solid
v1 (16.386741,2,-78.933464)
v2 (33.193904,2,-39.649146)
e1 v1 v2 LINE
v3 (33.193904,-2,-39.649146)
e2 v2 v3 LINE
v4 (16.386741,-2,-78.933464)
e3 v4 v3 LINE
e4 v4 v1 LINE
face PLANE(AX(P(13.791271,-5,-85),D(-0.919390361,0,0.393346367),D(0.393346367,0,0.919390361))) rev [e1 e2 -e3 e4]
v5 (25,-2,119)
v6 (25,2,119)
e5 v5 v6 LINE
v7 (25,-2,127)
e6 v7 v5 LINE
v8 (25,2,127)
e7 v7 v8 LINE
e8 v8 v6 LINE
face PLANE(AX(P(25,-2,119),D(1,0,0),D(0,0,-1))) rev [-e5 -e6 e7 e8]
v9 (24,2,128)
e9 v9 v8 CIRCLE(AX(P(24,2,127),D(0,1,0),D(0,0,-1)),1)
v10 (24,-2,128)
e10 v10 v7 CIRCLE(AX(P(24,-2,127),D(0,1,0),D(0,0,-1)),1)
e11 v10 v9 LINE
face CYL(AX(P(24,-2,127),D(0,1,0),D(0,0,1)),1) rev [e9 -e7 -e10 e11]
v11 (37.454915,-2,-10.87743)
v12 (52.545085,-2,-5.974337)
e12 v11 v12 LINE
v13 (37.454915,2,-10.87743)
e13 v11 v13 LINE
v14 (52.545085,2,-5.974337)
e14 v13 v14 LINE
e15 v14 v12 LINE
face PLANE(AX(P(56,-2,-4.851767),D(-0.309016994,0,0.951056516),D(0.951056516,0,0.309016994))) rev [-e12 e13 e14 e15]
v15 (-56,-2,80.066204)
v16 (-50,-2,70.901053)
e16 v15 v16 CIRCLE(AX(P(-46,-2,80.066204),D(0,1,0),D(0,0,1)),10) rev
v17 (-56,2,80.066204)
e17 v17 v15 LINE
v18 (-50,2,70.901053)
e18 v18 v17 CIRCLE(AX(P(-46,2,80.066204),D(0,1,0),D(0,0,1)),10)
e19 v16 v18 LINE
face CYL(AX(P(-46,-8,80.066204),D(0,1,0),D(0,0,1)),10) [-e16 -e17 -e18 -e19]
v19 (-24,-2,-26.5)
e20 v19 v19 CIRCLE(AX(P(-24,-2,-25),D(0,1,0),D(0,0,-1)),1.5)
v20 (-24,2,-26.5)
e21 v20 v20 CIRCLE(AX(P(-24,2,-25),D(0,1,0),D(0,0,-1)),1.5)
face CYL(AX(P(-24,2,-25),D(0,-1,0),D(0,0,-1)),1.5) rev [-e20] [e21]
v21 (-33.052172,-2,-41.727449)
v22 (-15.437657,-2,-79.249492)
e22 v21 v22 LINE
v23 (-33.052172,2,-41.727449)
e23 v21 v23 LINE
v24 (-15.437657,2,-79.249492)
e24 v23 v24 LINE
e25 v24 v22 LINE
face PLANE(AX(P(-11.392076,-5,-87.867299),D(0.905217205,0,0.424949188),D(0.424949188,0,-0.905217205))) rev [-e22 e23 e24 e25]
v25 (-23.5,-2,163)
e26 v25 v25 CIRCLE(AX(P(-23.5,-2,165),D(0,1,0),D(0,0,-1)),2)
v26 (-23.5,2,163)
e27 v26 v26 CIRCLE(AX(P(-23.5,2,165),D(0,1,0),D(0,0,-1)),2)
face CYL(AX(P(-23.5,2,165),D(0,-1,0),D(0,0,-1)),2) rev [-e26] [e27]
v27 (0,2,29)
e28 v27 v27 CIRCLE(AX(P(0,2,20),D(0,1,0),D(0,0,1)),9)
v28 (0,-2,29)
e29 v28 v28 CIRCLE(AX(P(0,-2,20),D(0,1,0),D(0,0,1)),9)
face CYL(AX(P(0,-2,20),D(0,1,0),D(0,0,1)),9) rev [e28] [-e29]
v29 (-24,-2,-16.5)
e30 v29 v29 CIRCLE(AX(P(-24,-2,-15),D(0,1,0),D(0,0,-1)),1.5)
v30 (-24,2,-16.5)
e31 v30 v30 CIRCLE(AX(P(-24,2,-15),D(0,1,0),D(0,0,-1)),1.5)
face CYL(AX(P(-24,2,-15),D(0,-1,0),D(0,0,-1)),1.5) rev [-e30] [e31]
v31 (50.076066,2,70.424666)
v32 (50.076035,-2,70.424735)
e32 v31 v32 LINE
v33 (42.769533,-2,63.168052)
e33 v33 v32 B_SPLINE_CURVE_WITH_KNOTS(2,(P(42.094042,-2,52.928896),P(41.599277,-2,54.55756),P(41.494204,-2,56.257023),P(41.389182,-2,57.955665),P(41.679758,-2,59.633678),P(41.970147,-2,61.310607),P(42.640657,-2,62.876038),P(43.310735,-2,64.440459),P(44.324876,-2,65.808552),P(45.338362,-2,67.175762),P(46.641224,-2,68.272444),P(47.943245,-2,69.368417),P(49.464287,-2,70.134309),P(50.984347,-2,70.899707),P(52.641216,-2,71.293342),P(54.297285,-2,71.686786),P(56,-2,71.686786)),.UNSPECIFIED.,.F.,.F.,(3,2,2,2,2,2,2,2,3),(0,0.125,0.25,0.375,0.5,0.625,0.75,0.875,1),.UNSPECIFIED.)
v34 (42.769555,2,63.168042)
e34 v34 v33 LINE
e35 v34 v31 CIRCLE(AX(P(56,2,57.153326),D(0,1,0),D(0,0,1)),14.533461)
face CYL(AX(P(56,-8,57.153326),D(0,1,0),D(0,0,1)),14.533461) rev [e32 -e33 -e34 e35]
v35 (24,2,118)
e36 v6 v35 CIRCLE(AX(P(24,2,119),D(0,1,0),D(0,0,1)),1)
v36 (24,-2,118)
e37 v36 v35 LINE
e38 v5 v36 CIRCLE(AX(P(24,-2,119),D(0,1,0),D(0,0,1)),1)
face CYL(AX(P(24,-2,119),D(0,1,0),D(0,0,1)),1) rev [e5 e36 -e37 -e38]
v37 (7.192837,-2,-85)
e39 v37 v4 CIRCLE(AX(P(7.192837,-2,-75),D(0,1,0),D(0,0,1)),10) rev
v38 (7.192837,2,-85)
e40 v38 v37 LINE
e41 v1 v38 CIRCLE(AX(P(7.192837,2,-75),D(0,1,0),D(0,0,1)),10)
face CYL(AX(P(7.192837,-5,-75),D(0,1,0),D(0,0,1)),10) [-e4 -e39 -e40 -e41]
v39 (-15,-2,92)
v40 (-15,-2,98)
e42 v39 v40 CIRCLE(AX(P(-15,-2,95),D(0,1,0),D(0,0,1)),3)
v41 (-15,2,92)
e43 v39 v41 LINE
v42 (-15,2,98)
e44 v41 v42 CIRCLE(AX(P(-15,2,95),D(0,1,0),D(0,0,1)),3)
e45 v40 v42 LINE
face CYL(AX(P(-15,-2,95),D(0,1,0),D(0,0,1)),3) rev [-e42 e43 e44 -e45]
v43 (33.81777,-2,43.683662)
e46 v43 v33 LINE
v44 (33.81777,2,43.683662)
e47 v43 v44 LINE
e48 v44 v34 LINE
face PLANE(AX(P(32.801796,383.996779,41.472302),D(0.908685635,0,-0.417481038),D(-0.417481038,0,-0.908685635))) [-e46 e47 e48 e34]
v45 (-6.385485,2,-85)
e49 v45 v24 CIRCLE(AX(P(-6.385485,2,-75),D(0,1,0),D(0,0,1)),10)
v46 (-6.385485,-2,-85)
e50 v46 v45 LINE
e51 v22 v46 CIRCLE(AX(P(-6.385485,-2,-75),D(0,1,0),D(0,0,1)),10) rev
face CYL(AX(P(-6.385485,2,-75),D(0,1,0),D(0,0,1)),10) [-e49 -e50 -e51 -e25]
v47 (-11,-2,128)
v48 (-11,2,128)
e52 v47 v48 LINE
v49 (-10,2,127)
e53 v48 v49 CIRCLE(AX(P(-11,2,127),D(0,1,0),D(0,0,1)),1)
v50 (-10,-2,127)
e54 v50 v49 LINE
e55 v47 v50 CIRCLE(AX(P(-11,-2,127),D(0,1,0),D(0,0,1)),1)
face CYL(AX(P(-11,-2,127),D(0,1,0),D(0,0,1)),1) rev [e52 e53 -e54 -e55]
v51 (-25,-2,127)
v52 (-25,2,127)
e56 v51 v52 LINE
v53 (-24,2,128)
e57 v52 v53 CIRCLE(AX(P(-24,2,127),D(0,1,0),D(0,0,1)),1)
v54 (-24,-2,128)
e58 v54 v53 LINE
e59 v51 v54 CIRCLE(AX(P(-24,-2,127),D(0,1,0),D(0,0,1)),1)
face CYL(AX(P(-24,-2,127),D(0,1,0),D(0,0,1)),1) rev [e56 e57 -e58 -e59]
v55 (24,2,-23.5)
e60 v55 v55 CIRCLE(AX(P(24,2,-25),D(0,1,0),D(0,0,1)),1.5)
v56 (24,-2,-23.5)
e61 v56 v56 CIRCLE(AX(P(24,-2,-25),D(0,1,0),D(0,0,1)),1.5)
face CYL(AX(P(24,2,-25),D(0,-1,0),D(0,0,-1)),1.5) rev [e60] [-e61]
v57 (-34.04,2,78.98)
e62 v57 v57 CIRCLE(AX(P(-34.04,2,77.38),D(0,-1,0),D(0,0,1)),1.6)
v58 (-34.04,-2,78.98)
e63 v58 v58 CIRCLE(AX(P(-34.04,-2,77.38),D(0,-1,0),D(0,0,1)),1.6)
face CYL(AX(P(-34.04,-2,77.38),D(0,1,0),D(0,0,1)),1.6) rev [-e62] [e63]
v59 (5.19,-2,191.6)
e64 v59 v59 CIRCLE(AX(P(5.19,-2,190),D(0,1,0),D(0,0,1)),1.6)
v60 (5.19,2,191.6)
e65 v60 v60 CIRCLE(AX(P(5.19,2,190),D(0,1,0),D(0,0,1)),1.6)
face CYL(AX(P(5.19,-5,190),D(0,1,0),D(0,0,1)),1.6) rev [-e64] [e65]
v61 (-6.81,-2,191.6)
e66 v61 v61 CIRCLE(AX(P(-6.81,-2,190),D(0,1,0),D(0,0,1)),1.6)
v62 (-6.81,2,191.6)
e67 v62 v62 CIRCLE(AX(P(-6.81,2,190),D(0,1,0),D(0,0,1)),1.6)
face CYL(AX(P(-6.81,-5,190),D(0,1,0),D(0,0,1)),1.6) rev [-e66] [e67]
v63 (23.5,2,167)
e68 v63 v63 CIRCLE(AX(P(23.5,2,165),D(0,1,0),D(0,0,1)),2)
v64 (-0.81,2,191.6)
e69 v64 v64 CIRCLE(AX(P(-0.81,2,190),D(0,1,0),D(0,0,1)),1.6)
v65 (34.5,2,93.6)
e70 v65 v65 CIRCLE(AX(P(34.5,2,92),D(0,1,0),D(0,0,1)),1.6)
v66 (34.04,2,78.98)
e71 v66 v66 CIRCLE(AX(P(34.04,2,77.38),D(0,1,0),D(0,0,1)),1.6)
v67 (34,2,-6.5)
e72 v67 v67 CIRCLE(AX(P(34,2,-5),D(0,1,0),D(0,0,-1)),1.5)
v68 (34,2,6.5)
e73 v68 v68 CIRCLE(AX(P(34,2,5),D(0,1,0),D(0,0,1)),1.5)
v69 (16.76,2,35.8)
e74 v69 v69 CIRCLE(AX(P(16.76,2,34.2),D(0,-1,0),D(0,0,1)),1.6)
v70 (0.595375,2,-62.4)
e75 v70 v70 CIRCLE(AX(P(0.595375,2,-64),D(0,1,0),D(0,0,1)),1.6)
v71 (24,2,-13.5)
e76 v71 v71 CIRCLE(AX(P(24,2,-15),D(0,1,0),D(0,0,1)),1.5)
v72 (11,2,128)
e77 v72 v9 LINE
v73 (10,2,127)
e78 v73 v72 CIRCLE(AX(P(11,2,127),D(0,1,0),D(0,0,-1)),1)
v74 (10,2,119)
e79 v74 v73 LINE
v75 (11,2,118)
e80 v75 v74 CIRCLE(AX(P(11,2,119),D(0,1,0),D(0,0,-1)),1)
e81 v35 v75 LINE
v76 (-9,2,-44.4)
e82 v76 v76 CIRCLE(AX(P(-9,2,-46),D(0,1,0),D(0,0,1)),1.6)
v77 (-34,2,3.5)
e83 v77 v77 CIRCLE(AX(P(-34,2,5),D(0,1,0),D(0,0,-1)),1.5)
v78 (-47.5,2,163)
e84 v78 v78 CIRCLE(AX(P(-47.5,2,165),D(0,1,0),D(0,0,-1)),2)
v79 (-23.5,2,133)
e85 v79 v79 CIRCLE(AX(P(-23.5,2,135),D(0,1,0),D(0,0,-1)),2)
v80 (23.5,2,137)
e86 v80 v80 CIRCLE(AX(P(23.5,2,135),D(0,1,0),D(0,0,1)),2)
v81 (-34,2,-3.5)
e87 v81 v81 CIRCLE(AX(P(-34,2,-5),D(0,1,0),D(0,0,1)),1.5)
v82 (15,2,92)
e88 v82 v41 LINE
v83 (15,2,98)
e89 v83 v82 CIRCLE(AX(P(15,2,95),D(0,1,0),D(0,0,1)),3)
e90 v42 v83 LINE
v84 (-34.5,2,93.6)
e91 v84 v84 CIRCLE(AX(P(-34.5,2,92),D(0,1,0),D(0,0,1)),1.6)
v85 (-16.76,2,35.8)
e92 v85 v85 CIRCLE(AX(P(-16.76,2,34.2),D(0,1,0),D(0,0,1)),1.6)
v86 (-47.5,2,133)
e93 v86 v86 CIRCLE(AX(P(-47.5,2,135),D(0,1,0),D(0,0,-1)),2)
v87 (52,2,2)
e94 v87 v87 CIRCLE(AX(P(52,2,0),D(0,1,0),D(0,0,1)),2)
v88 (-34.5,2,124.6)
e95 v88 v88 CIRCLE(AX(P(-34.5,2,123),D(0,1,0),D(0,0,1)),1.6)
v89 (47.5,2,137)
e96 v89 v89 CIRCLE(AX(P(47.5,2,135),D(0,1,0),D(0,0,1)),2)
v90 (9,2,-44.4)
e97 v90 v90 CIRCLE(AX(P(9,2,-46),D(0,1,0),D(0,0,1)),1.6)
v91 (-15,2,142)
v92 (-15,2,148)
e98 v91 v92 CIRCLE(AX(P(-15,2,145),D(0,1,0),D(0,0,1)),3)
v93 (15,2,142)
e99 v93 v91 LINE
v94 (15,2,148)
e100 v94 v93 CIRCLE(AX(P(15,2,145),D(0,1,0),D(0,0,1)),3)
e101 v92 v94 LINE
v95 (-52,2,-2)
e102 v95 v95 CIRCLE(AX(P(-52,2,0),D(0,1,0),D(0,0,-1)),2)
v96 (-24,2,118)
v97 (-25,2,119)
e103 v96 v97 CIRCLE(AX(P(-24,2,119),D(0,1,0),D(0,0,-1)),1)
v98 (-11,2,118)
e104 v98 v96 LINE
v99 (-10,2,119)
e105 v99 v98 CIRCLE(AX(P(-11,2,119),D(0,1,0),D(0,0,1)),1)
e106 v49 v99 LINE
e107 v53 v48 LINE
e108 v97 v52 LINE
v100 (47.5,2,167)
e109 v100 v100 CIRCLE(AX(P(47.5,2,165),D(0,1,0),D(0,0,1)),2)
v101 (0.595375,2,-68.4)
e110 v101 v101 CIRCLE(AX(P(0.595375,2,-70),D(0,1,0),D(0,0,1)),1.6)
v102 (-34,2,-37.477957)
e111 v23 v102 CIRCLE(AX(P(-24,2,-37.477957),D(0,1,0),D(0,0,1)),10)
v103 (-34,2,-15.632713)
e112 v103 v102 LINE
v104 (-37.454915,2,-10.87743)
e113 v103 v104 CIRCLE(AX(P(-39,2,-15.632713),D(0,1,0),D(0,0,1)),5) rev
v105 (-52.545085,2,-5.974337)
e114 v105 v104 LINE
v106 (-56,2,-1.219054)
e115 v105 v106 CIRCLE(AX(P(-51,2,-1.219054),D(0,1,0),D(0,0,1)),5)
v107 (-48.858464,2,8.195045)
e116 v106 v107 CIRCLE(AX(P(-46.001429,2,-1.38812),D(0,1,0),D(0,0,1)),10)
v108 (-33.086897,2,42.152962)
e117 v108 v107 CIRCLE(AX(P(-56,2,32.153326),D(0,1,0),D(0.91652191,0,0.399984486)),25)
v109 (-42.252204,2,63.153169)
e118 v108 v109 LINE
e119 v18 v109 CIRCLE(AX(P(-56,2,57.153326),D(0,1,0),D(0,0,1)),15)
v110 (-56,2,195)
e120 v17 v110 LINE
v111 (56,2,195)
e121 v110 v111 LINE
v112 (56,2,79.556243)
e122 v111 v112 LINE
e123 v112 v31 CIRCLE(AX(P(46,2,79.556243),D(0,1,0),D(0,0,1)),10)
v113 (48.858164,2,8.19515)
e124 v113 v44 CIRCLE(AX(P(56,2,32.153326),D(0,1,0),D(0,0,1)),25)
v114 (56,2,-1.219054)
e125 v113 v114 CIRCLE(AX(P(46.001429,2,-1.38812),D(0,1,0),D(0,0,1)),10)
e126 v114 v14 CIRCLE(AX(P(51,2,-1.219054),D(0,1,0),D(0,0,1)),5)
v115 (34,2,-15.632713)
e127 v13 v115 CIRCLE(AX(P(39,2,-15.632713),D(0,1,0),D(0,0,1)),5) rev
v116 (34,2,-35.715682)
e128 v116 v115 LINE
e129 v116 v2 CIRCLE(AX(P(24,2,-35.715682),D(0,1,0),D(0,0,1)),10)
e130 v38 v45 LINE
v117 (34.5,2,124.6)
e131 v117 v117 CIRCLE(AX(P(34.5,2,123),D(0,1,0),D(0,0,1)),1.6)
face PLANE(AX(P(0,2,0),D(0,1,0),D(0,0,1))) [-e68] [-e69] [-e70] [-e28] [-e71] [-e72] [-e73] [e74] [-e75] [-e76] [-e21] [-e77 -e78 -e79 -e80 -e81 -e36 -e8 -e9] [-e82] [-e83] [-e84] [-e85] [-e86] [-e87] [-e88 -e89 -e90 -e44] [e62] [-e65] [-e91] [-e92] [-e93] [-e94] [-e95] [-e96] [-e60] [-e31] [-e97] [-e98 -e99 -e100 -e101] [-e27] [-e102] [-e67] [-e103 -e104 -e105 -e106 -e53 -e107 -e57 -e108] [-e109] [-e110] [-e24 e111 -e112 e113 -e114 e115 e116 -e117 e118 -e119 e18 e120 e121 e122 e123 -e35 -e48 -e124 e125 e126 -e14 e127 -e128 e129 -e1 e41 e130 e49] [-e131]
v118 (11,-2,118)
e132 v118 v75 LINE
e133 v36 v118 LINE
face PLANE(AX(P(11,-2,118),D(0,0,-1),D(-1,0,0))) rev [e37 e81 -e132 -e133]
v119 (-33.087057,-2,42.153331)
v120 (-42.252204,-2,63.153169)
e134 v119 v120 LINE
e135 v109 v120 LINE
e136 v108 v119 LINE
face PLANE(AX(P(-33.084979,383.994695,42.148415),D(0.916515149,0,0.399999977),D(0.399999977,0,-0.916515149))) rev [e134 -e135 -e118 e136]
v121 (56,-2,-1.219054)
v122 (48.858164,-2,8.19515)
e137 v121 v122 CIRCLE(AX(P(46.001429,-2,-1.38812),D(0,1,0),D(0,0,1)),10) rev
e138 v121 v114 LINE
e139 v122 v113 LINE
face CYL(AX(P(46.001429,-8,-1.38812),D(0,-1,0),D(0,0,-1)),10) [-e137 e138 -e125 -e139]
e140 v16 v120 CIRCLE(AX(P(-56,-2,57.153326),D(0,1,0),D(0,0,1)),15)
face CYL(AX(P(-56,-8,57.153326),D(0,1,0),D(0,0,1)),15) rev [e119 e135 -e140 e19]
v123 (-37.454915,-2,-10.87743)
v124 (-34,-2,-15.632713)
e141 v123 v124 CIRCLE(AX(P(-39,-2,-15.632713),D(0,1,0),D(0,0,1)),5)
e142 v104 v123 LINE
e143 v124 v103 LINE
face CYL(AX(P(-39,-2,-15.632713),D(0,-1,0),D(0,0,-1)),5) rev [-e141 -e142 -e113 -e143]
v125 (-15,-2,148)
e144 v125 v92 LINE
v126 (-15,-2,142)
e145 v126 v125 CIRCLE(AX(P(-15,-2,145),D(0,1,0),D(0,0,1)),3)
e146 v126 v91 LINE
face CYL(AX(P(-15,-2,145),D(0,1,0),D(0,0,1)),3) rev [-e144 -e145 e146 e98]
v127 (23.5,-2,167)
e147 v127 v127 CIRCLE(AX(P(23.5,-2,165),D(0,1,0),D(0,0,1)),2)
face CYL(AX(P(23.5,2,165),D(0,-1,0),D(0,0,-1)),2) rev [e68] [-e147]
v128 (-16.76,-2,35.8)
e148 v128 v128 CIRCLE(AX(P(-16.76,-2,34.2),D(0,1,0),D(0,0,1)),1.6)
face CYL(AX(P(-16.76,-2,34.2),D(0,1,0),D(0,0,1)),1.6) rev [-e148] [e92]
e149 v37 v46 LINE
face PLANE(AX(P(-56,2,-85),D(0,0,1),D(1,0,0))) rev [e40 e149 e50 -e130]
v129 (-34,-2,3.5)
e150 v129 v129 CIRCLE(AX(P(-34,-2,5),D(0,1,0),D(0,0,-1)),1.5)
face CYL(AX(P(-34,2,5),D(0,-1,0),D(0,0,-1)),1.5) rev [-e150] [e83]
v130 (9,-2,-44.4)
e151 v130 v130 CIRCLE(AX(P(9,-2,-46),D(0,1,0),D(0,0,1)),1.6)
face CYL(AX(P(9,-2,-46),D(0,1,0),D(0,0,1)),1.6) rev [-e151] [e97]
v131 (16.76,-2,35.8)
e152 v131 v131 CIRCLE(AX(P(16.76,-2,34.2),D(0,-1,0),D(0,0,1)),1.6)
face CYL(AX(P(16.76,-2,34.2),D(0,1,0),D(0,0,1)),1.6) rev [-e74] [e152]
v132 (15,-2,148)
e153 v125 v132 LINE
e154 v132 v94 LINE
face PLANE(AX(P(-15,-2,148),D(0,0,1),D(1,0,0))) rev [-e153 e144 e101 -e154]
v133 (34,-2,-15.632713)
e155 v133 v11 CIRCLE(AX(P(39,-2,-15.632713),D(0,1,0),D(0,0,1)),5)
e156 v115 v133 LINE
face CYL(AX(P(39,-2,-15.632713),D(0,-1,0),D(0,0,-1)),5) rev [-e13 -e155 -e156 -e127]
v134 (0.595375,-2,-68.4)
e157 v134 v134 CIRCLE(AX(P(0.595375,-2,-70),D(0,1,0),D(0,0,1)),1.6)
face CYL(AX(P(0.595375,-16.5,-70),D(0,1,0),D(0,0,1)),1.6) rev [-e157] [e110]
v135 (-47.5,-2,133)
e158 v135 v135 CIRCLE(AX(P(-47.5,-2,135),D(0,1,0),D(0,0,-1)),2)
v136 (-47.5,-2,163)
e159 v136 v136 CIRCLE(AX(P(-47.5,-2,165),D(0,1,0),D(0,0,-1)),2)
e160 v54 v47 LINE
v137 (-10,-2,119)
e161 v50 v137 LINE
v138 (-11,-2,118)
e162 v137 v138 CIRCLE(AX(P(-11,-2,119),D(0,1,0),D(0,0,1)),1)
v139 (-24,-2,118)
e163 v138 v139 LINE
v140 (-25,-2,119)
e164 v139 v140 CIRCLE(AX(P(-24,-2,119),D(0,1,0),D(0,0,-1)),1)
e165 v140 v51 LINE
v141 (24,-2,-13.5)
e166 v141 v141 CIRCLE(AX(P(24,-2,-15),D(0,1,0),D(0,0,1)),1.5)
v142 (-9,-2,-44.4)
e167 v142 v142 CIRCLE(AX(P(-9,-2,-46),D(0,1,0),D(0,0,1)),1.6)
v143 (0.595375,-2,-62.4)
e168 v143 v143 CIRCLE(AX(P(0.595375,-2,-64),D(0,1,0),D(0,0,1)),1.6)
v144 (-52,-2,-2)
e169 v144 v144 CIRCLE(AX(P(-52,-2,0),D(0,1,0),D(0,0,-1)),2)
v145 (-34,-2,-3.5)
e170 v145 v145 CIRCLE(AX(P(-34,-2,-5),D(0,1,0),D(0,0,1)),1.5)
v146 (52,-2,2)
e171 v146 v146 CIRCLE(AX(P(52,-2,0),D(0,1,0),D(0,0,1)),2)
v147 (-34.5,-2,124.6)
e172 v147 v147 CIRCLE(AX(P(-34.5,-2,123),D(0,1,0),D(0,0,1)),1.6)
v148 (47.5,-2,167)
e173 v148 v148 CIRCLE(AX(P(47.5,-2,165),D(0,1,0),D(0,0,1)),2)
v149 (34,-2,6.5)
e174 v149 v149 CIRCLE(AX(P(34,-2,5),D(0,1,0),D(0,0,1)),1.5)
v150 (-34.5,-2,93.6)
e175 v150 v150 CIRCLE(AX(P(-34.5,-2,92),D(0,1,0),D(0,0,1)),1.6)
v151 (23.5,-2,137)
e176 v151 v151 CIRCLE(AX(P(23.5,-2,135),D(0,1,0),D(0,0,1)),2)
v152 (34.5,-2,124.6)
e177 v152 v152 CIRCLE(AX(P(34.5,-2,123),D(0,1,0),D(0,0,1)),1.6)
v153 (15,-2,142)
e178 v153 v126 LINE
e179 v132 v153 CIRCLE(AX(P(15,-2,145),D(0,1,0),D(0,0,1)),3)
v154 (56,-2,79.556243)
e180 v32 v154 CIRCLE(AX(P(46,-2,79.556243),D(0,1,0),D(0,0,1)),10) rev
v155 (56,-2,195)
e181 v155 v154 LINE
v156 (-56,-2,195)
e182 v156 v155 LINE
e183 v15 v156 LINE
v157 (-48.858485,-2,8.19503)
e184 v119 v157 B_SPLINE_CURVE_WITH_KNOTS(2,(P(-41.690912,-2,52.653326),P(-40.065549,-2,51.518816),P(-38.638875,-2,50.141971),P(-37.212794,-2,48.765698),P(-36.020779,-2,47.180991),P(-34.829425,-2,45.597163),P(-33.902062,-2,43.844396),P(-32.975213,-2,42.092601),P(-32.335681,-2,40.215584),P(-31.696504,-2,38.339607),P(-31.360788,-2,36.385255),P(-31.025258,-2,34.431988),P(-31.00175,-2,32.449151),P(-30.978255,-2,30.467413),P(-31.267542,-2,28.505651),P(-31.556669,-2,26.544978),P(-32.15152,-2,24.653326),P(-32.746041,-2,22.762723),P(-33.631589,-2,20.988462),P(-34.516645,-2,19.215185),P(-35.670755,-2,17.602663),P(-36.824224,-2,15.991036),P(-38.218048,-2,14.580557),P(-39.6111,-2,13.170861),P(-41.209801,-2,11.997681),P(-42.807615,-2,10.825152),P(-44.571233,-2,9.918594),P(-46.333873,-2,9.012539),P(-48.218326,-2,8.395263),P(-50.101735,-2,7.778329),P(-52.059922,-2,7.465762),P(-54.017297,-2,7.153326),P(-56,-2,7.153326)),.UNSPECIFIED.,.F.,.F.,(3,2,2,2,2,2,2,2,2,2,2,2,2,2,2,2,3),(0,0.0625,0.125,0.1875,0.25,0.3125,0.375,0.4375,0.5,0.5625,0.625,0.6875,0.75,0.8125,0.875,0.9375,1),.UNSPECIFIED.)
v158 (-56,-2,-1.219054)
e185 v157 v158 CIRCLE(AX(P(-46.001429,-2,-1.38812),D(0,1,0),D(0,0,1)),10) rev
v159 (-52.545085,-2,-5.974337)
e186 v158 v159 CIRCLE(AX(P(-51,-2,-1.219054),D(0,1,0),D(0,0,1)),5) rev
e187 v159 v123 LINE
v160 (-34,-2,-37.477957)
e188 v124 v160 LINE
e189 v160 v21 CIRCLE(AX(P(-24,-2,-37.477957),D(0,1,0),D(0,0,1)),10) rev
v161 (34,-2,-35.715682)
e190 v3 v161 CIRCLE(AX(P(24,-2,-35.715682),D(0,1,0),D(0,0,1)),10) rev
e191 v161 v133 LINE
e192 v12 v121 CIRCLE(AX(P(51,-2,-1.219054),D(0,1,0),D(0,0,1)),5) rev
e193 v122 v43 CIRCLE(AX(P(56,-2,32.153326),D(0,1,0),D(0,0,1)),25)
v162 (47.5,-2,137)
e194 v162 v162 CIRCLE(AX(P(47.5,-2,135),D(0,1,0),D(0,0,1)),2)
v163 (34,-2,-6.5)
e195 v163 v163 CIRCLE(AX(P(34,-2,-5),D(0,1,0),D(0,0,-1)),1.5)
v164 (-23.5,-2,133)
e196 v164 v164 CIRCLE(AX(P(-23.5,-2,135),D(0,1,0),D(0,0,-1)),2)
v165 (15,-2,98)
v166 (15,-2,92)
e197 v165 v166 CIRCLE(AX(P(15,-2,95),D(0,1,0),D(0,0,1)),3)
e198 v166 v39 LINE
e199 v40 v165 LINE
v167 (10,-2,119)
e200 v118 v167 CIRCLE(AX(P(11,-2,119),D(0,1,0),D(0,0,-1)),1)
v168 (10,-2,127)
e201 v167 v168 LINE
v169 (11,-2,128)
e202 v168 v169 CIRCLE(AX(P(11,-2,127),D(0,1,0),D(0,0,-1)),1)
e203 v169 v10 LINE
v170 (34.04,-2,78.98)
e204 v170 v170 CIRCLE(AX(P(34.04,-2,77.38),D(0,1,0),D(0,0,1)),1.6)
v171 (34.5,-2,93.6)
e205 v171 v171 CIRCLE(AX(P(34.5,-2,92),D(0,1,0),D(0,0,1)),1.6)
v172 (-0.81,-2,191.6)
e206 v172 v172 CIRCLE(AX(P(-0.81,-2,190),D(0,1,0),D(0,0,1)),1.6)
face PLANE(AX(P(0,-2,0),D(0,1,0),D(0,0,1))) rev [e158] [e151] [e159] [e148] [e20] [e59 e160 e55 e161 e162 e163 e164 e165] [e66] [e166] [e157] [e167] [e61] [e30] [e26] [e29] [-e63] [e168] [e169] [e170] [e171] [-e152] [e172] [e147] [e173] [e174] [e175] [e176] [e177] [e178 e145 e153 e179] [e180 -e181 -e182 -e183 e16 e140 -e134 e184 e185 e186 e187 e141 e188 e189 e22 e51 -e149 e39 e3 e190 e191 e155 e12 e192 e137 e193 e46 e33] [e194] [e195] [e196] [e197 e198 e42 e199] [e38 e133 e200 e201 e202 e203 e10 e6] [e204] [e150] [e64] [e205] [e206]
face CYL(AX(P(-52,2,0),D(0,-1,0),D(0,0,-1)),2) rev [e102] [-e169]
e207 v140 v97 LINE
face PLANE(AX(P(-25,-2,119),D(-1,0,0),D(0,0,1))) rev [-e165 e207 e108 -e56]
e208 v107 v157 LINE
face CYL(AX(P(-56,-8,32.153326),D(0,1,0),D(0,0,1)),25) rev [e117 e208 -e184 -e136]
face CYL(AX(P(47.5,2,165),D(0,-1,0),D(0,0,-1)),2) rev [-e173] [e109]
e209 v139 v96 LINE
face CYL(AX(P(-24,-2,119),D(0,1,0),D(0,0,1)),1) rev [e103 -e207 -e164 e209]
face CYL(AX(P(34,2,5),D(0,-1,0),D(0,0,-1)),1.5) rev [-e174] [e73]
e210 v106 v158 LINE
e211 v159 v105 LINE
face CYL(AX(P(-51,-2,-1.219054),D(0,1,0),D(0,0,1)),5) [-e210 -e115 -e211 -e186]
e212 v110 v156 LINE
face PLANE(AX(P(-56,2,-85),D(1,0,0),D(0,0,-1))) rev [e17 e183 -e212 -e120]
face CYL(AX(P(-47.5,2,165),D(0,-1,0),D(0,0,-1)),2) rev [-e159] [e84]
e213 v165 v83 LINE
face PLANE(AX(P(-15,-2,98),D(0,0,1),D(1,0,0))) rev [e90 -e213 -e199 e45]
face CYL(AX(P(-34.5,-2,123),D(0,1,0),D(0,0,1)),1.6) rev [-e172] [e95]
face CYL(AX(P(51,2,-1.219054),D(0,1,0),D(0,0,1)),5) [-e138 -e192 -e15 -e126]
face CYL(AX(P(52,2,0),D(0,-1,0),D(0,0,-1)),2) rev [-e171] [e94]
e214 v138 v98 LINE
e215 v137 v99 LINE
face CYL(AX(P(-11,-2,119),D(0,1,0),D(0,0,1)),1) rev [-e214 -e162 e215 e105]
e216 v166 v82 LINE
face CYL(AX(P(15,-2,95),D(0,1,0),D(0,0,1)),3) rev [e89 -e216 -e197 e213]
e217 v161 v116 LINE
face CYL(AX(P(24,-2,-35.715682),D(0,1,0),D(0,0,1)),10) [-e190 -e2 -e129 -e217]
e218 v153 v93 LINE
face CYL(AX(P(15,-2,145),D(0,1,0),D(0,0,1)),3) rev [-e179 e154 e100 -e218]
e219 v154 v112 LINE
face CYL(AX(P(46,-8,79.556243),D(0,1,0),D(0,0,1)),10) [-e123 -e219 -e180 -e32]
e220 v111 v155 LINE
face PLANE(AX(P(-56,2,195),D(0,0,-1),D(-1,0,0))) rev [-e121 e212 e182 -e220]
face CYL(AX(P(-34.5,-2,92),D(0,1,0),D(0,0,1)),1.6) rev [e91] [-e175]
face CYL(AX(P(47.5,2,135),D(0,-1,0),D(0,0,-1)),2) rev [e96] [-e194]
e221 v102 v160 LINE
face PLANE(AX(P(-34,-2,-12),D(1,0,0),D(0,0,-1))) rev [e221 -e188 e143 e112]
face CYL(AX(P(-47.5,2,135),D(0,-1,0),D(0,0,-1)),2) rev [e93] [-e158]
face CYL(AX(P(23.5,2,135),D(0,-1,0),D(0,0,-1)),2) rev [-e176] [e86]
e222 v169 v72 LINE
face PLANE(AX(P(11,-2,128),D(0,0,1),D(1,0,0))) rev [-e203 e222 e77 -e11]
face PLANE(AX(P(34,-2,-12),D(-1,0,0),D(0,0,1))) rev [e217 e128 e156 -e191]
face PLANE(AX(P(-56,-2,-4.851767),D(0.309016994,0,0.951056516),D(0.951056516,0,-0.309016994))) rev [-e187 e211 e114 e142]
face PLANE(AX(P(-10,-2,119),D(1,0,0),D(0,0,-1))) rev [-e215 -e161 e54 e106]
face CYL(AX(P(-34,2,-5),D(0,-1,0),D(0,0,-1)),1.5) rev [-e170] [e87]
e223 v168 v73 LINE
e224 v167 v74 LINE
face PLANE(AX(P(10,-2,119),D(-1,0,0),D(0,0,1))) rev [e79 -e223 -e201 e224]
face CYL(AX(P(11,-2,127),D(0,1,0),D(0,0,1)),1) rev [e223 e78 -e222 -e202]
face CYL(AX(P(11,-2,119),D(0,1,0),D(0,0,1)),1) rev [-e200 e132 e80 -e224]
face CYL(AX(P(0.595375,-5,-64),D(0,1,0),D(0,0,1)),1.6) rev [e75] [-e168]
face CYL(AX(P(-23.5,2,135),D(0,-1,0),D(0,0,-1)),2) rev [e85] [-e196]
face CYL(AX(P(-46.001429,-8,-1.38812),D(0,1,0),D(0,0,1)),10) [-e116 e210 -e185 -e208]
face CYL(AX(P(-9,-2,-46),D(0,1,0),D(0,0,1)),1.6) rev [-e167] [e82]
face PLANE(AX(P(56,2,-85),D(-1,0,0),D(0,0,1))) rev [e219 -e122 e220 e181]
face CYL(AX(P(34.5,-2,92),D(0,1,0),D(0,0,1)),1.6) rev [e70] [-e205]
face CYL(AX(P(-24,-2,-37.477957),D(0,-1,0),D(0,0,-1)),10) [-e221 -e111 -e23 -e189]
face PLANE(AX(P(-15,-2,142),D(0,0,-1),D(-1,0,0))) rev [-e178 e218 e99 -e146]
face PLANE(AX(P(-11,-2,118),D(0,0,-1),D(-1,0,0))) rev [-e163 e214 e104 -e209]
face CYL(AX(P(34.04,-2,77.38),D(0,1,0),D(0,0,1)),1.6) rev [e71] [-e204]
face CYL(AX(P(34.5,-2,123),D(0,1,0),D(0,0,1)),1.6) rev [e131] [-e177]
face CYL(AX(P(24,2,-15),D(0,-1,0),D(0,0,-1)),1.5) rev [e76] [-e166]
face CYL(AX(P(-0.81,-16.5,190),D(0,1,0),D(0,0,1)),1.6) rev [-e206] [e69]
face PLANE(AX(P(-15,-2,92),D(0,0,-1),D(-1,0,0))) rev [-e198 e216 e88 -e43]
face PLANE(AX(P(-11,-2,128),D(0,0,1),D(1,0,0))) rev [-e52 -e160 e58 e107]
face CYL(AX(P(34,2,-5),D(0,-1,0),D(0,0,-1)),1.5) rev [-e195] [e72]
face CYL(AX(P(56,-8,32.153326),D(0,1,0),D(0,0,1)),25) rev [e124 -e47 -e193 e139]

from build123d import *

# Parameters (mm, degrees)
SKETCH1_W               = 112
SKETCH1_H               = 280
SKETCH1_R               = 2
SKETCH1_R_2             = 1.5
BOSS_EXTRUDE1_DEPTH     = 2
CUT_EXTRUDE1_DEPTH      = 203.891596672
CUT_EXTRUDE1_DEPTH_BACK = 203.891596672
CUT_EXTRUDE2_DEPTH      = 203.891596672
CUT_EXTRUDE2_DEPTH_BACK = 203.891596672
SKETCH3_R               = 1.6
SKETCH4_R               = 1.6
CUT_EXTRUDE3_DEPTH      = 203.921166959
CUT_EXTRUDE4_DEPTH      = 203.891596672
CUT_EXTRUDE4_DEPTH_BACK = 203.891596672
SKETCH5_R               = 9
CUT_EXTRUDE5_DEPTH      = 203.891596672
CUT_EXTRUDE5_DEPTH_BACK = 203.891596672
SKETCH6_R               = 1.6
FILLET_1_R              = 5
SKETCH_1_R              = 25
CUT_EXTRUDE_1_DEPTH     = 10
SKETCH_2_R              = 15
SKETCH_2_R_2            = 14.533460532
CUT_EXTRUDE_2_DEPTH     = 10
CUT_EXTRUDE_START       = -5
CUT_EXTRUDE_6_DEPTH     = 6
CUT_EXTRUDE_7_DEPTH     = 6
CUT_EXTRUDE_8_DEPTH     = 5
CUT_EXTRUDE_9_DEPTH     = 5
SKETCH_9_R              = 2
CUT_EXTRUDE_11_DEPTH    = 10
SKETCH_11_R             = 2
CUT_EXTRUDE_12_DEPTH    = 5
SKETCH_12_R             = 2
EXTRUDE_1_DEPTH         = 2
SKETCH_15_R             = 2
CUT_EXTRUDE_13_DEPTH    = 250
FILLET_2_R              = 10
FILLET_3_R              = 10
FILLET_5_R              = 10
FILLET_6_R              = 10
SKETCH_17_R             = 2
CUT_EXTRUDE_16_DEPTH    = 10
CUT_EXTRUDE_17_DEPTH    = 5
CUT_EXTRUDE_18_DEPTH    = 5
FILLET_7_R              = 10
FILLET_8_R              = 10
SKETCH_20_R             = 1.6
EXTRUDE_4_DEPTH         = 7
SKETCH_22_R             = 2
EXTRUDE_6_DEPTH         = 2
SKETCH_23_R             = 1.6
CUT_EXTRUDE_19_DEPTH    = 16.5
SKETCH_24_R             = 1.6
EXTRUDE_7_DEPTH         = 16.5
SKETCH_25_R             = 2
EXTRUDE_8_DEPTH         = 2
SKETCH_26_R             = 1.6
CUT_EXTRUDE_20_DEPTH    = 16.5
SKETCH_27_R             = 1.6
CUT_EXTRUDE_21_DEPTH    = 5
SKETCH_28_R             = 1.6
CUT_EXTRUDE_22_DEPTH    = 5
SKETCH_29_R             = 1.6
CUT_EXTRUDE_23_DEPTH    = 5


with BuildPart() as part:
    # Sketch1 → Boss-Extrude1 (new, symmetric)
    with BuildSketch(Plane(origin=(0, 0, 0), x_dir=(1, 0, 0), z_dir=(0, 1, 0))):
        with Locations((0, -55)):
            Rectangle(SKETCH1_W, SKETCH1_H)
        with Locations(Location((52, 0, 0), (0, 0, 270))):
            Circle(SKETCH1_R, mode=Mode.SUBTRACT)
        with Locations(Location((34, -5, 0), (0, 0, 270))):
            Circle(SKETCH1_R_2, mode=Mode.SUBTRACT)
        with Locations(Location((34, 5, 0), (0, 0, 90))):
            Circle(SKETCH1_R_2, mode=Mode.SUBTRACT)
        with Locations(Location((24, 15, 0), (0, 0, 270))):
            Circle(SKETCH1_R_2, mode=Mode.SUBTRACT)
        with Locations(Location((24, 25, 0), (0, 0, 270))):
            Circle(SKETCH1_R_2, mode=Mode.SUBTRACT)
        with Locations(Location((47.5, -135, 0), (0, 0, 270))):
            Circle(SKETCH1_R, mode=Mode.SUBTRACT)
        with Locations(Location((23.5, -135, 0), (0, 0, 270))):
            Circle(SKETCH1_R, mode=Mode.SUBTRACT)
        with Locations(Location((23.5, -165, 0), (0, 0, 270))):
            Circle(SKETCH1_R, mode=Mode.SUBTRACT)
        with Locations(Location((47.5, -165, 0), (0, 0, 270))):
            Circle(SKETCH1_R, mode=Mode.SUBTRACT)
        with Locations(Location((-47.5, -135, 0), (0, 0, 90))):
            Circle(SKETCH1_R, mode=Mode.SUBTRACT)
        with Locations(Location((-47.5, -165, 0), (0, 0, 90))):
            Circle(SKETCH1_R, mode=Mode.SUBTRACT)
        with Locations(Location((-23.5, -165, 0), (0, 0, 90))):
            Circle(SKETCH1_R, mode=Mode.SUBTRACT)
        with Locations(Location((-23.5, -135, 0), (0, 0, 90))):
            Circle(SKETCH1_R, mode=Mode.SUBTRACT)
        with Locations(Location((-34, -5, 0), (0, 0, 90))):
            Circle(SKETCH1_R_2, mode=Mode.SUBTRACT)
        with Locations(Location((-52, 0, 0), (0, 0, 90))):
            Circle(SKETCH1_R, mode=Mode.SUBTRACT)
        with Locations(Location((-34, 5, 0), (0, 0, 270))):
            Circle(SKETCH1_R_2, mode=Mode.SUBTRACT)
        with Locations(Location((-24, 15, 0), (0, 0, 90))):
            Circle(SKETCH1_R_2, mode=Mode.SUBTRACT)
        with Locations(Location((-24, 25, 0), (0, 0, 90))):
            Circle(SKETCH1_R_2, mode=Mode.SUBTRACT)
    extrude(amount=BOSS_EXTRUDE1_DEPTH, both=True)

    # Sketch2 → Cut-Extrude1 (cut, two sides: drawn at the far end of the back side and taken through both)
    with BuildSketch(Plane(origin=(0, 0, 0), x_dir=(1, 0, 0), z_dir=(0, 1, 0)).offset(-CUT_EXTRUDE1_DEPTH_BACK)):
        Polygon((-56, 4.851766683), (-34, 12), (-34, 85), (-56, 85), align=None)
        Polygon((56, 85), (56, 4.851766683), (34, 12), (34, 85), align=None)
    extrude(amount=CUT_EXTRUDE1_DEPTH + CUT_EXTRUDE1_DEPTH_BACK, mode=Mode.SUBTRACT)

    # Sketch3 → Cut-Extrude2 (cut, two sides: drawn at the far end of the back side and taken through both)
    with BuildSketch(Plane(origin=(0, 0, 0), x_dir=(1, 0, 0), z_dir=(0, 1, 0)).offset(-CUT_EXTRUDE2_DEPTH_BACK)):
        with Locations(Location((-9, 46, 0), (0, 0, 270))):
            Circle(SKETCH3_R)
        with Locations(Location((9, 46, 0), (0, 0, 270))):
            Circle(SKETCH3_R)
    extrude(amount=CUT_EXTRUDE2_DEPTH + CUT_EXTRUDE2_DEPTH_BACK, mode=Mode.SUBTRACT)

    # Sketch4 → Cut-Extrude3 (cut, through all)
    with BuildSketch(Plane(origin=(0, 2, 0), x_dir=(1, 0, 0), z_dir=(0, 1, 0))):
        with Locations(Location((34.04, -77.38, 0), (0, 0, 270))):
            Circle(SKETCH4_R)
        with Locations(Location((-16.76, -34.2, 0), (0, 0, 270))):
            Circle(SKETCH4_R)
    cut_extrude3 = extrude(amount=-CUT_EXTRUDE3_DEPTH, mode=Mode.SUBTRACT)

    # Sketch5 → Cut-Extrude4 (cut, two sides: drawn at the far end of the back side and taken through both)
    with BuildSketch(Plane(origin=(0, 0, 0), x_dir=(1, 0, 0), z_dir=(0, 1, 0)).offset(-CUT_EXTRUDE4_DEPTH_BACK)):
        with Locations(Location((0, -20, 0), (0, 0, 270))):
            Circle(SKETCH5_R)
        with BuildLine():
            Line((-15, -92), (15, -92))
            ThreePointArc((15, -92), (18, -95), (15, -98))
            Line((15, -98), (-15, -98))
            ThreePointArc((-15, -98), (-18, -95), (-15, -92))
        make_face()
        with BuildLine():
            Line((-15, -142), (15, -142))
            ThreePointArc((15, -142), (18, -145), (15, -148))
            Line((15, -148), (-15, -148))
            ThreePointArc((-15, -148), (-18, -145), (-15, -142))
        make_face()
        with BuildLine():
            Line((11, -118), (24, -118))
            ThreePointArc((24, -118), (24.707106781, -118.292893219), (25, -119))
            Line((25, -119), (25, -127))
            ThreePointArc((25, -127), (24.707106781, -127.707106781), (24, -128))
            Line((24, -128), (11, -128))
            ThreePointArc((11, -128), (10.292893219, -127.707106781), (10, -127))
            Line((10, -127), (10, -119))
            ThreePointArc((10, -119), (10.292893219, -118.292893219), (11, -118))
        make_face()
        with BuildLine():
            Line((-25, -119), (-25, -127))
            ThreePointArc((-25, -127), (-24.707106781, -127.707106781), (-24, -128))
            Line((-24, -128), (-11, -128))
            ThreePointArc((-11, -128), (-10.292893219, -127.707106781), (-10, -127))
            Line((-10, -127), (-10, -119))
            ThreePointArc((-10, -119), (-10.292893219, -118.292893219), (-11, -118))
            Line((-11, -118), (-24, -118))
            ThreePointArc((-24, -118), (-24.707106781, -118.292893219), (-25, -119))
        make_face()
    extrude(amount=CUT_EXTRUDE4_DEPTH + CUT_EXTRUDE4_DEPTH_BACK, mode=Mode.SUBTRACT)

    # Sketch6 → Cut-Extrude5 (cut, two sides: drawn at the far end of the back side and taken through both)
    with BuildSketch(Plane(origin=(0, 0, 0), x_dir=(1, 0, 0), z_dir=(0, 1, 0)).offset(-CUT_EXTRUDE5_DEPTH_BACK)):
        with Locations(Location((-34.5, -92, 0), (0, 0, 270))):
            Circle(SKETCH6_R)
        with Locations(Location((34.5, -92, 0), (0, 0, 270))):
            Circle(SKETCH6_R)
        with Locations(Location((34.5, -123, 0), (0, 0, 270))):
            Circle(SKETCH6_R)
        with Locations(Location((-34.5, -123, 0), (0, 0, 270))):
            Circle(SKETCH6_R)
    extrude(amount=CUT_EXTRUDE5_DEPTH + CUT_EXTRUDE5_DEPTH_BACK, mode=Mode.SUBTRACT)

    # Mirror1: Cut-Extrude3 across plane
    add(cut_extrude3.mirror(Plane(origin=(0, 0, 0), x_dir=(0, 0, 1), z_dir=(1, 0, 0))), mode=Mode.SUBTRACT)

    # 圆角1
    fillet_1_edges = [part.edges().sort_by_distance(p)[0] for p in [
        (56, 0, -4.851766683),
        (34, 0, -12),
        (-56, 0, -4.851766683),
        (-34, 0, -12),
    ]]
    fillet(fillet_1_edges, radius=FILLET_1_R)

    # 草图1 → 切除-拉伸1 (cut)
    with BuildSketch(Plane(origin=(0, 2, 0), x_dir=(1, 0, 0), z_dir=(0, 1, 0))):
        with Locations((-56, -32.153325809)):
            Circle(SKETCH_1_R)
        with Locations((56, -32.153325809)):
            Circle(SKETCH_1_R)
    extrude(amount=-CUT_EXTRUDE_1_DEPTH, mode=Mode.SUBTRACT)

    # 草图2 → 切除-拉伸2 (cut)
    with BuildSketch(Plane(origin=(0, 2, 0), x_dir=(1, 0, 0), z_dir=(0, 1, 0))):
        with Locations((-56, -57.153325809)):
            Circle(SKETCH_2_R)
        with Locations((56, -57.153325809)):
            Circle(SKETCH_2_R_2)
    extrude(amount=-CUT_EXTRUDE_2_DEPTH, mode=Mode.SUBTRACT)

    # 切除-拉伸6: read off the stored shape, not the designer's step
    # 切除-拉伸6 outline → 切除-拉伸6 (cut)
    with BuildSketch(Plane(origin=(0, 2, 0), x_dir=(1, 0, 0), z_dir=(0, 1, 0)).offset(CUT_EXTRUDE_START)):
        with BuildLine():
            ThreePointArc((-41.690911979, -52.653325809), (-41.021386735, -57.954040891), (-42.252204443, -63.153168915))
            Line((-42.252204443, -63.153168915), (-33.086952257, -42.152937958))
            ThreePointArc((-33.086952257, -42.152937958), (-36.662565218, -47.998312904), (-41.690911979, -52.653325809))
        make_face()
    extrude(amount=CUT_EXTRUDE_6_DEPTH, mode=Mode.SUBTRACT)

    # 切除-拉伸7: read off the stored shape, not the designer's step
    # 切除-拉伸7 outline → 切除-拉伸7 (cut)
    with BuildSketch(Plane(origin=(0, 2, 0), x_dir=(1, 0, 0), z_dir=(0, 1, 0)).offset(CUT_EXTRUDE_START)):
        with BuildLine():
            Line((33.817769755, -43.683662376), (42.769555279, -63.16804172))
            ThreePointArc((42.769555279, -63.16804172), (41.498065161, -58.110070778), (42.094041909, -52.928896308))
            ThreePointArc((42.094041909, -52.928896308), (37.373193458, -48.827919598), (33.817769755, -43.683662376))
        make_face()
    extrude(amount=CUT_EXTRUDE_7_DEPTH, mode=Mode.SUBTRACT)

    # 草图5 → 切除-拉伸8 (cut, symmetric)
    with BuildSketch(Plane(origin=(0, 0, 0), x_dir=(1, 0, 0), z_dir=(0, 1, 0))):
        Polygon((-34, 71.940987389), (-18.114624984, 85), (-34, 85), align=None)
    extrude(amount=CUT_EXTRUDE_8_DEPTH, both=True, mode=Mode.SUBTRACT)

    # 草图6 → 切除-拉伸9 (cut, symmetric)
    with BuildSketch(Plane(origin=(0, 0, 0), x_dir=(1, 0, 0), z_dir=(0, 1, 0))):
        Polygon((34, 71.940987389), (16.763732813, 85), (34, 85), align=None)
    extrude(amount=CUT_EXTRUDE_9_DEPTH, both=True, mode=Mode.SUBTRACT)

    # 草图9 → 切除-拉伸11 (cut)
    with BuildSketch(Plane(origin=(0, 0, 0), x_dir=(1, 0, 0), z_dir=(0, 1, 0))):
        with Locations(Location((0.81, -190, 0), (0, 0, 270))):
            Circle(SKETCH_9_R)
    extrude(amount=CUT_EXTRUDE_11_DEPTH, mode=Mode.SUBTRACT)

    # 草图11 → 切除-拉伸12 (cut, symmetric)
    with BuildSketch(Plane(origin=(0, 0, 0), x_dir=(1, 0, 0), z_dir=(0, 1, 0))):
        with Locations(Location((0.81, -190, 0), (0, 0, 270))):
            Circle(SKETCH_11_R)
    extrude(amount=CUT_EXTRUDE_12_DEPTH, both=True, mode=Mode.SUBTRACT)

    # 草图12 → 凸台-拉伸1 (add, symmetric)
    with BuildSketch(Plane(origin=(0, 0, 0), x_dir=(1, 0, 0), z_dir=(0, 1, 0))):
        with Locations((0.81, -190)):
            Circle(SKETCH_12_R)
    extrude(amount=EXTRUDE_1_DEPTH, both=True)

    # 草图15 → 切除-拉伸13 (cut, symmetric)
    with BuildSketch(Plane(origin=(0, 0, 0), x_dir=(1, 0, 0), z_dir=(0, 1, 0))):
        with Locations(Location((-0.81, -190, 0), (0, 0, 270))):
            Circle(SKETCH_15_R)
    extrude(amount=CUT_EXTRUDE_13_DEPTH, both=True, mode=Mode.SUBTRACT)

    # 圆角2
    fillet_2_edges = [part.edges().sort_by_distance(p)[0] for p in [
        (-56, 0, 72.153325809),
    ]]
    fillet(fillet_2_edges, radius=FILLET_2_R)

    # 圆角3
    # the kernel refuses this fillet: 10 mm, written as the material it takes off along each edge
    with BuildSketch(Plane(origin=(-56, -22.930949629, 7.153325809), x_dir=(0.9895269126071098, 0, 0.1443484992171419), z_dir=(0, 1, 0))) as fillet_3_piece_1:
        with BuildLine():
            CenterArc((8.660909953, 9.895269126), FILLET_3_R, 189.268276471, 72.43216948)
            Line((-1.208540466, 8.284695186), (-1.405929475, 8.252483707))
            ThreePointArc((-1.405929475, 8.252483707), (-0.802175616, 4.113477893), (-0.197905383, -0.0288697))
            Line((-0.197905383, -0.0288697), (0.0288697, -0.197905383))
            ThreePointArc((0.0288697, -0.197905383), (3.60871248, 0.061827185), (7.188555261, -0.197905383))
            Line((7.188555261, -0.197905383), (7.217424961, 0))
        make_face()
    extrude(amount=45.861899257, mode=Mode.SUBTRACT)

    # 圆角5
    fillet_5_edges = [part.edges().sort_by_distance(p)[0] for p in [
        (56, 0, 71.68678634),
    ]]
    fillet(fillet_5_edges, radius=FILLET_5_R)

    # 圆角6
    # the kernel refuses this fillet: 10 mm, written as the material it takes off along each edge
    with BuildSketch(Plane(origin=(56, -22.930949629, 7.153325809), x_dir=(-0.9895269126071098, 0, 0.14434849921714205), z_dir=(0, 1, 0))) as fillet_6_piece_1:
        with BuildLine():
            CenterArc((8.660909953, -9.895269126), FILLET_6_R, 98.29955405, 72.43216948)
            Line((-1.208540466, -8.284695186), (-1.405929475, -8.252483707))
            ThreePointArc((-1.405929475, -8.252483707), (-0.802175616, -4.113477893), (-0.197905383, 0.0288697))
            Line((-0.197905383, 0.0288697), (0.0288697, 0.197905383))
            ThreePointArc((0.0288697, 0.197905383), (3.60871248, -0.061827185), (7.188555261, 0.197905383))
            Line((7.188555261, 0.197905383), (7.217424961, 0))
        make_face()
    extrude(amount=45.861899257, mode=Mode.SUBTRACT)

    # 草图17 → 切除-拉伸16 (cut, symmetric)
    with BuildSketch(Plane(origin=(0, 0, 0), x_dir=(1, 0, 0), z_dir=(0, 1, 0))):
        with Locations(Location((0.595375016, 70, 0), (0, 0, 270))):
            Circle(SKETCH_17_R)
    extrude(amount=CUT_EXTRUDE_16_DEPTH, both=True, mode=Mode.SUBTRACT)

    # 草图18 → 切除-拉伸17 (cut, symmetric)
    with BuildSketch(Plane(origin=(0, 0, 0), x_dir=(1, 0, 0), z_dir=(0, 1, 0))):
        Polygon((-11.392075785, 87.867298623), (-36.815883507, 33.710075075), (-63.292748353, 82.602013001), align=None)
    extrude(amount=CUT_EXTRUDE_17_DEPTH, both=True, mode=Mode.SUBTRACT)

    # 草图19 → 切除-拉伸18 (cut, symmetric)
    with BuildSketch(Plane(origin=(0, 0, 0), x_dir=(1, 0, 0), z_dir=(0, 1, 0))):
        Polygon((13.791270616, 85), (34, 37.765011841), (51.054063119, 37.765011841), (57.938009556, 70.02787223), (19.299009454, 103.397917773), align=None)
    extrude(amount=CUT_EXTRUDE_18_DEPTH, both=True, mode=Mode.SUBTRACT)

    # 圆角7
    fillet_7_edges = [part.edges().sort_by_distance(p)[0] for p in [
        (13.791270616, 0, -85),
    ]]
    fillet(fillet_7_edges, radius=FILLET_7_R)

    # 圆角8
    fillet_8_edges = [part.edges().sort_by_distance(p)[0] for p in [
        (-34, 0, -39.708406805),
        (-12.738113195, 0, -85),
        (34, 0, -37.765011841),
    ]]
    fillet(fillet_8_edges, radius=FILLET_8_R)



with BuildPart() as body_2:
    # 草图20 → 凸台-拉伸4 (new, symmetric)
    with BuildSketch(Plane(origin=(0, 0, 0), x_dir=(1, 0, 0), z_dir=(0, 1, 0))):
        with Locations(Location((0.595375016, 70, 0), (0, 0, 270))):
            Circle(SKETCH_20_R)
    extrude(amount=EXTRUDE_4_DEPTH, both=True)


with BuildPart() as part_1:
    add(part.part)

    add(body_2.part)  # 凸台-拉伸6 merges body 2
    # 草图22 → 凸台-拉伸6 (add, symmetric)
    with BuildSketch(Plane(origin=(0, 0, 0), x_dir=(1, 0, 0), z_dir=(0, 1, 0))):
        with Locations((0.595375016, 70)):
            Circle(SKETCH_22_R)
    extrude(amount=EXTRUDE_6_DEPTH, both=True)

    # 草图23 → 切除-拉伸19 (cut, symmetric)
    with BuildSketch(Plane(origin=(0, 0, 0), x_dir=(1, 0, 0), z_dir=(0, 1, 0))):
        with Locations(Location((0.595375016, 70, 0), (0, 0, 270))):
            Circle(SKETCH_23_R)
    extrude(amount=CUT_EXTRUDE_19_DEPTH, both=True, mode=Mode.SUBTRACT)



with BuildPart() as body_2_2:
    # 草图24 → 凸台-拉伸7 (new, symmetric)
    with BuildSketch(Plane(origin=(0, 0, 0), x_dir=(1, 0, 0), z_dir=(0, 1, 0))):
        with Locations(Location((-0.81, -190, 0), (0, 0, 270))):
            Circle(SKETCH_24_R)
    extrude(amount=EXTRUDE_7_DEPTH, both=True)


with BuildPart() as part_2:
    add(part_1.part)

    add(body_2_2.part)  # 凸台-拉伸8 merges body 2 2
    # 草图25 → 凸台-拉伸8 (add, symmetric)
    with BuildSketch(Plane(origin=(0, 0, 0), x_dir=(1, 0, 0), z_dir=(0, 1, 0))):
        with Locations((-0.81, -190)):
            Circle(SKETCH_25_R)
    extrude(amount=EXTRUDE_8_DEPTH, both=True)

    # 草图26 → 切除-拉伸20 (cut, symmetric)
    with BuildSketch(Plane(origin=(0, 0, 0), x_dir=(1, 0, 0), z_dir=(0, 1, 0))):
        with Locations(Location((-0.81, -190, 0), (0, 0, 270))):
            Circle(SKETCH_26_R)
    extrude(amount=CUT_EXTRUDE_20_DEPTH, both=True, mode=Mode.SUBTRACT)

    # 草图27 → 切除-拉伸21 (cut, symmetric)
    with BuildSketch(Plane(origin=(0, 0, 0), x_dir=(1, 0, 0), z_dir=(0, 1, 0))):
        with Locations(Location((5.19, -190, 0), (0, 0, 270))):
            Circle(SKETCH_27_R)
    extrude(amount=CUT_EXTRUDE_21_DEPTH, both=True, mode=Mode.SUBTRACT)

    # 草图28 → 切除-拉伸22 (cut, symmetric)
    with BuildSketch(Plane(origin=(0, 0, 0), x_dir=(1, 0, 0), z_dir=(0, 1, 0))):
        with Locations(Location((-6.81, -190, 0), (0, 0, 270))):
            Circle(SKETCH_28_R)
    extrude(amount=CUT_EXTRUDE_22_DEPTH, both=True, mode=Mode.SUBTRACT)

    # 草图29 → 切除-拉伸23 (cut, symmetric)
    with BuildSketch(Plane(origin=(0, 0, 0), x_dir=(1, 0, 0), z_dir=(0, 1, 0))):
        with Locations(Location((0.595375016, 64, 0), (0, 0, 270))):
            Circle(SKETCH_29_R)
    extrude(amount=CUT_EXTRUDE_23_DEPTH, both=True, mode=Mode.SUBTRACT)


solid = part_2.part
